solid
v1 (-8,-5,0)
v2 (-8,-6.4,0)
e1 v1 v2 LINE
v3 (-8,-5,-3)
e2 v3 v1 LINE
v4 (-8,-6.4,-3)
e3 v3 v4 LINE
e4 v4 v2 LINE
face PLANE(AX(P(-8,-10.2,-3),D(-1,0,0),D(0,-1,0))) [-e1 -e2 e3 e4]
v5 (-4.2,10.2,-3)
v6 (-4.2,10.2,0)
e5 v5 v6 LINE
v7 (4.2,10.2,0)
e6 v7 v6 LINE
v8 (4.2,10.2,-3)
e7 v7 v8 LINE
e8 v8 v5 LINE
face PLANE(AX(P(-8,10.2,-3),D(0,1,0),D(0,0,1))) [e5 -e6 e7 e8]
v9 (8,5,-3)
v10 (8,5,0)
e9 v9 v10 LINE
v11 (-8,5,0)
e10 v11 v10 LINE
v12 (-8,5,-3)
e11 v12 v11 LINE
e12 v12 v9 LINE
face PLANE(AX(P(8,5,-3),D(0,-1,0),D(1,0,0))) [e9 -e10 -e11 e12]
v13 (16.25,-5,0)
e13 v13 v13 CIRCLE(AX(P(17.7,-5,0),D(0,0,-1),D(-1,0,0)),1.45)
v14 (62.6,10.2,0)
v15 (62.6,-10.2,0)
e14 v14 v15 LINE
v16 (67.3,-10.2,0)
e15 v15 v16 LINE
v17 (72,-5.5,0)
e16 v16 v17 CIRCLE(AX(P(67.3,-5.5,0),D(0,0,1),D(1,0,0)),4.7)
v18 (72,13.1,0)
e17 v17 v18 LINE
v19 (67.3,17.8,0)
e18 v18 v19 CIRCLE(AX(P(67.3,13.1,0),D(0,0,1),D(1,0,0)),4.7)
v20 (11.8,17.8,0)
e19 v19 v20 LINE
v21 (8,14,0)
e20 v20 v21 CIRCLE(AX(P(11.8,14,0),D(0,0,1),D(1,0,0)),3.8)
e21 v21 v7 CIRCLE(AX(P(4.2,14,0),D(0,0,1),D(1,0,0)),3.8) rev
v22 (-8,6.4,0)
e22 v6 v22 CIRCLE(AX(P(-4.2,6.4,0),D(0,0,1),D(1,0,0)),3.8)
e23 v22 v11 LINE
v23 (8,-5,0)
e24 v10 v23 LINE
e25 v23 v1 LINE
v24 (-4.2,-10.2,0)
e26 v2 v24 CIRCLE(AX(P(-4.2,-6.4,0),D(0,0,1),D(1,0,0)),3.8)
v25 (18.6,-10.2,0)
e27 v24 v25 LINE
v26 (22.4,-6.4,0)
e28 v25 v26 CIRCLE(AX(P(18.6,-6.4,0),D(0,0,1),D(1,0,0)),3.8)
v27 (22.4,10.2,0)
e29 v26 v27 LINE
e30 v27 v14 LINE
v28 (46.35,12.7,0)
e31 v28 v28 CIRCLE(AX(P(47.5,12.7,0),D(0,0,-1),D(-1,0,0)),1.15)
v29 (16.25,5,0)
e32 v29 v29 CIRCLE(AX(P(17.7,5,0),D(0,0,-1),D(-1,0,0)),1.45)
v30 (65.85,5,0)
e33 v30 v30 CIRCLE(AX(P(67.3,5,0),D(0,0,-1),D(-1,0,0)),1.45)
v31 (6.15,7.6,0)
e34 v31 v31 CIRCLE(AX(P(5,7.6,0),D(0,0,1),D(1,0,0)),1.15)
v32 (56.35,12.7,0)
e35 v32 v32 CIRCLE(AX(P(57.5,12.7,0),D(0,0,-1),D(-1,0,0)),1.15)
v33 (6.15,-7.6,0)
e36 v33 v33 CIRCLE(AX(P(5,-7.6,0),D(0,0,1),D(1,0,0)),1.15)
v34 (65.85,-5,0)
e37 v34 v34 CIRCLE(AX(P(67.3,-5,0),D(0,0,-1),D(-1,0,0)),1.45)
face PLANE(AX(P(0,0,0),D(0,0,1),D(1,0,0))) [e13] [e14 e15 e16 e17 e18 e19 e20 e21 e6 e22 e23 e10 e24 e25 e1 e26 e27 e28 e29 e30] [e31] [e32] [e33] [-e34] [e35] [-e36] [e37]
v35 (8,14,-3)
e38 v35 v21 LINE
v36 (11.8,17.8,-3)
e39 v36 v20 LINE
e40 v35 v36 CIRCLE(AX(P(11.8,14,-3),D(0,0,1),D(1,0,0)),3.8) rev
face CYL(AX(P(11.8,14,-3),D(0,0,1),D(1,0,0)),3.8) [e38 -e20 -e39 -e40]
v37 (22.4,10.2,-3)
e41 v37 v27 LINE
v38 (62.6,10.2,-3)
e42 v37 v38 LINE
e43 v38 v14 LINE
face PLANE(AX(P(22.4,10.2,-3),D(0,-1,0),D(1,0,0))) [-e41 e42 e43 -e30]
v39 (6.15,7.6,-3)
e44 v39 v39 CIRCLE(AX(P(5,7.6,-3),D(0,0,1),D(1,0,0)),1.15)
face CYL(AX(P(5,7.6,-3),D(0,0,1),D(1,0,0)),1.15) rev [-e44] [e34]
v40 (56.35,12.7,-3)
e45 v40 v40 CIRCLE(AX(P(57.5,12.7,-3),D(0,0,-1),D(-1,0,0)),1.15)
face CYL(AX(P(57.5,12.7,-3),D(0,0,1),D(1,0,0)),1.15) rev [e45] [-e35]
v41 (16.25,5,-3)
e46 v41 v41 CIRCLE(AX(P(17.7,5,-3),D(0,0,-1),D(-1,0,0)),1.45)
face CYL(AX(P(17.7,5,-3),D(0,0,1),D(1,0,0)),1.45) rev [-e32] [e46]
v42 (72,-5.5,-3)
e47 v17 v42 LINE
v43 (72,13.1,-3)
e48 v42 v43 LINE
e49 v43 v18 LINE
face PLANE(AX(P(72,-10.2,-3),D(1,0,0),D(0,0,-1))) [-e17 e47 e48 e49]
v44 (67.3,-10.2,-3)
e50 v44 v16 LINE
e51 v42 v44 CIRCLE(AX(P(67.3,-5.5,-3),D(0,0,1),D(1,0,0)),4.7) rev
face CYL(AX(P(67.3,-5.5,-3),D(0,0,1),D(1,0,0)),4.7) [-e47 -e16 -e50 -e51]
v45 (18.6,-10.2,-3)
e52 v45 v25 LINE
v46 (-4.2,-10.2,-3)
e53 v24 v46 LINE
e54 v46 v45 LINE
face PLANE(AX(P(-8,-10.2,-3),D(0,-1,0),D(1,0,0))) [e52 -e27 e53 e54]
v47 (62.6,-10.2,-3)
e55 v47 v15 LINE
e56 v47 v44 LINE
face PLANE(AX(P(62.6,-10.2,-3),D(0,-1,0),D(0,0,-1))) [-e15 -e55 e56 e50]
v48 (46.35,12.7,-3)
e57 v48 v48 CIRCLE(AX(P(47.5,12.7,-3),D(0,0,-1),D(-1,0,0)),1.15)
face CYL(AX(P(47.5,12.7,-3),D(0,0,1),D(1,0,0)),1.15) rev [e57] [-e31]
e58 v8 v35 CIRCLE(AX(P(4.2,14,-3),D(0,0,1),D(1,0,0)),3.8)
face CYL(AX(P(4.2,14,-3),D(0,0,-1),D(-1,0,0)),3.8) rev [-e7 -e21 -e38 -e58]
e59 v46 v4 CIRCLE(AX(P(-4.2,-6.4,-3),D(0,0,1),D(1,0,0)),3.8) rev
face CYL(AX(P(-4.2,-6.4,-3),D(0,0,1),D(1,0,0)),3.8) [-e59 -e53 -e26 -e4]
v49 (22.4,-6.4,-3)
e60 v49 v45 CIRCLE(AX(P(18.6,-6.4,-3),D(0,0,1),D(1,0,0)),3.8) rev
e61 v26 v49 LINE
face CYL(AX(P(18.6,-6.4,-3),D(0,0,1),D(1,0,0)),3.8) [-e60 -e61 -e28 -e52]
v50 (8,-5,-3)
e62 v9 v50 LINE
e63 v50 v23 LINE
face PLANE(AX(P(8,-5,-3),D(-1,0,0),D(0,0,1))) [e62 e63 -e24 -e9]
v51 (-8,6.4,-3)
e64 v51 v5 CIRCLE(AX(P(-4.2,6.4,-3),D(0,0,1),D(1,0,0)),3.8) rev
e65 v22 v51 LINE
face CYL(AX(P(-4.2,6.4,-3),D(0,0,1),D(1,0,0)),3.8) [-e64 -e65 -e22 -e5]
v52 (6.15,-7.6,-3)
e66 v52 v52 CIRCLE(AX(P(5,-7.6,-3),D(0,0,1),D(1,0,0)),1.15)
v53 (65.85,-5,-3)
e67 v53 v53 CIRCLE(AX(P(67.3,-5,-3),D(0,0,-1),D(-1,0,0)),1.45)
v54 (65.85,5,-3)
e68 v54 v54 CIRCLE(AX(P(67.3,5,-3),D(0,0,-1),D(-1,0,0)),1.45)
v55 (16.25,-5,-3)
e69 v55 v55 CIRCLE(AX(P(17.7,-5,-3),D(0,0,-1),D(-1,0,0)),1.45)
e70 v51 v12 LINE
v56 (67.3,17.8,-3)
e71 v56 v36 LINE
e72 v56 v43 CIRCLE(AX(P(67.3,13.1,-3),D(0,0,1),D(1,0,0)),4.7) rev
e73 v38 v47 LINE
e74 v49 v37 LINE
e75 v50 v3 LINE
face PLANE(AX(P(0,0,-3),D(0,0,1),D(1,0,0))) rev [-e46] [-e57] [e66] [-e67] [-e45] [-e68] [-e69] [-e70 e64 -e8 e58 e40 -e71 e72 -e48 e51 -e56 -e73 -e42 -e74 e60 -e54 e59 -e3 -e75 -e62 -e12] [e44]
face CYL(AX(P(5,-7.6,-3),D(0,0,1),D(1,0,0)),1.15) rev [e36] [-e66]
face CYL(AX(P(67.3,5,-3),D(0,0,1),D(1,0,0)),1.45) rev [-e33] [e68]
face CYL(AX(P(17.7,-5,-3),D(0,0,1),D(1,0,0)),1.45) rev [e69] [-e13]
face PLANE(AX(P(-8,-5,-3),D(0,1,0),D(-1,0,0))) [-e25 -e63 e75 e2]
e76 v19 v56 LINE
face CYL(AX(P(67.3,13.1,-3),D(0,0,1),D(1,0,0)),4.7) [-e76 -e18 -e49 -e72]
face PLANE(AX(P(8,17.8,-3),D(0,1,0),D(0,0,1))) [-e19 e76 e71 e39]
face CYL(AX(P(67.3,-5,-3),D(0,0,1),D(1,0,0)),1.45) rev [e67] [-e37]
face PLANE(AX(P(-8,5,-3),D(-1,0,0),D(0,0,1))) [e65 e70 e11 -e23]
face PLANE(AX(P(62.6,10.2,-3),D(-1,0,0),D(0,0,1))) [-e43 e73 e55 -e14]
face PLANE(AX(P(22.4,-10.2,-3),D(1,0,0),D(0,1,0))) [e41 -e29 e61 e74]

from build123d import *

# Parameters (mm, degrees)
BOSS_EXTRUDE7_DEPTH = 3
SKETCH12_R          = 1.15
CUT_EXTRUDE3_DEPTH  = 75.228296491
SKETCH11_R          = 1.45
CUT_EXTRUDE4_DEPTH  = 75.228296491
SKETCH13_R          = 1.15
CUT_EXTRUDE5_DEPTH  = 75.228296491
FILLET1_R           = 4.7
FILLET2_R           = 3.8


with BuildPart() as part:
    # Sketch10 → Boss-Extrude7 (new body)
    with BuildSketch(Plane.XY):
        Polygon((22.4, 10.2), (62.6, 10.2), (62.6, -10.2), (72, -10.2), (72, 17.8), (8, 17.8), (8, 10.2), (-8, 10.2), (-8, 5), (8, 5), (8, -5), (-8, -5), (-8, -10.2), (22.4, -10.2), align=None)
    extrude(amount=-BOSS_EXTRUDE7_DEPTH)

    # Sketch12 → Cut-Extrude3 (cut, through all)
    with BuildSketch(Plane(origin=(0, 0, 0), x_dir=(-1, 0, 0), z_dir=(0, 0, -1))):
        with Locations((-57.5, 12.7)):
            Circle(SKETCH12_R)
        with Locations((-47.5, 12.7)):
            Circle(SKETCH12_R)
    extrude(amount=CUT_EXTRUDE3_DEPTH, mode=Mode.SUBTRACT)

    # Sketch11 → Cut-Extrude4 (cut, through all)
    with BuildSketch(Plane(origin=(0, 0, 0), x_dir=(-1, 0, 0), z_dir=(0, 0, -1))):
        with Locations((-67.3, -5)):
            Circle(SKETCH11_R)
        with Locations((-17.7, -5)):
            Circle(SKETCH11_R)
        with Locations((-17.7, 5)):
            Circle(SKETCH11_R)
        with Locations((-67.3, 5)):
            Circle(SKETCH11_R)
    extrude(amount=CUT_EXTRUDE4_DEPTH, mode=Mode.SUBTRACT)

    # Sketch13 → Cut-Extrude5 (cut, through all)
    with BuildSketch(Plane.XY):
        with Locations((5, 7.6)):
            Circle(SKETCH13_R)
        with Locations((5, -7.6)):
            Circle(SKETCH13_R)
    extrude(amount=-CUT_EXTRUDE5_DEPTH, mode=Mode.SUBTRACT)

    # Fillet1
    fillet1_edges = [part.edges().sort_by_distance(p)[0] for p in [
        (72, 17.8, -1.5),
        (72, -10.2, -1.5),
    ]]
    fillet(fillet1_edges, radius=FILLET1_R)

    # Fillet2
    fillet2_edges = [part.edges().sort_by_distance(p)[0] for p in [
        (22.4, -10.2, -1.5),
        (-8, -10.2, -1.5),
        (8, 17.8, -1.5),
        (8, 10.2, -1.5),
        (-8, 10.2, -1.5),
    ]]
    fillet(fillet2_edges, radius=FILLET2_R - 0.0001)  # a hair under: the kernel refuses the full size


solid = part.part
